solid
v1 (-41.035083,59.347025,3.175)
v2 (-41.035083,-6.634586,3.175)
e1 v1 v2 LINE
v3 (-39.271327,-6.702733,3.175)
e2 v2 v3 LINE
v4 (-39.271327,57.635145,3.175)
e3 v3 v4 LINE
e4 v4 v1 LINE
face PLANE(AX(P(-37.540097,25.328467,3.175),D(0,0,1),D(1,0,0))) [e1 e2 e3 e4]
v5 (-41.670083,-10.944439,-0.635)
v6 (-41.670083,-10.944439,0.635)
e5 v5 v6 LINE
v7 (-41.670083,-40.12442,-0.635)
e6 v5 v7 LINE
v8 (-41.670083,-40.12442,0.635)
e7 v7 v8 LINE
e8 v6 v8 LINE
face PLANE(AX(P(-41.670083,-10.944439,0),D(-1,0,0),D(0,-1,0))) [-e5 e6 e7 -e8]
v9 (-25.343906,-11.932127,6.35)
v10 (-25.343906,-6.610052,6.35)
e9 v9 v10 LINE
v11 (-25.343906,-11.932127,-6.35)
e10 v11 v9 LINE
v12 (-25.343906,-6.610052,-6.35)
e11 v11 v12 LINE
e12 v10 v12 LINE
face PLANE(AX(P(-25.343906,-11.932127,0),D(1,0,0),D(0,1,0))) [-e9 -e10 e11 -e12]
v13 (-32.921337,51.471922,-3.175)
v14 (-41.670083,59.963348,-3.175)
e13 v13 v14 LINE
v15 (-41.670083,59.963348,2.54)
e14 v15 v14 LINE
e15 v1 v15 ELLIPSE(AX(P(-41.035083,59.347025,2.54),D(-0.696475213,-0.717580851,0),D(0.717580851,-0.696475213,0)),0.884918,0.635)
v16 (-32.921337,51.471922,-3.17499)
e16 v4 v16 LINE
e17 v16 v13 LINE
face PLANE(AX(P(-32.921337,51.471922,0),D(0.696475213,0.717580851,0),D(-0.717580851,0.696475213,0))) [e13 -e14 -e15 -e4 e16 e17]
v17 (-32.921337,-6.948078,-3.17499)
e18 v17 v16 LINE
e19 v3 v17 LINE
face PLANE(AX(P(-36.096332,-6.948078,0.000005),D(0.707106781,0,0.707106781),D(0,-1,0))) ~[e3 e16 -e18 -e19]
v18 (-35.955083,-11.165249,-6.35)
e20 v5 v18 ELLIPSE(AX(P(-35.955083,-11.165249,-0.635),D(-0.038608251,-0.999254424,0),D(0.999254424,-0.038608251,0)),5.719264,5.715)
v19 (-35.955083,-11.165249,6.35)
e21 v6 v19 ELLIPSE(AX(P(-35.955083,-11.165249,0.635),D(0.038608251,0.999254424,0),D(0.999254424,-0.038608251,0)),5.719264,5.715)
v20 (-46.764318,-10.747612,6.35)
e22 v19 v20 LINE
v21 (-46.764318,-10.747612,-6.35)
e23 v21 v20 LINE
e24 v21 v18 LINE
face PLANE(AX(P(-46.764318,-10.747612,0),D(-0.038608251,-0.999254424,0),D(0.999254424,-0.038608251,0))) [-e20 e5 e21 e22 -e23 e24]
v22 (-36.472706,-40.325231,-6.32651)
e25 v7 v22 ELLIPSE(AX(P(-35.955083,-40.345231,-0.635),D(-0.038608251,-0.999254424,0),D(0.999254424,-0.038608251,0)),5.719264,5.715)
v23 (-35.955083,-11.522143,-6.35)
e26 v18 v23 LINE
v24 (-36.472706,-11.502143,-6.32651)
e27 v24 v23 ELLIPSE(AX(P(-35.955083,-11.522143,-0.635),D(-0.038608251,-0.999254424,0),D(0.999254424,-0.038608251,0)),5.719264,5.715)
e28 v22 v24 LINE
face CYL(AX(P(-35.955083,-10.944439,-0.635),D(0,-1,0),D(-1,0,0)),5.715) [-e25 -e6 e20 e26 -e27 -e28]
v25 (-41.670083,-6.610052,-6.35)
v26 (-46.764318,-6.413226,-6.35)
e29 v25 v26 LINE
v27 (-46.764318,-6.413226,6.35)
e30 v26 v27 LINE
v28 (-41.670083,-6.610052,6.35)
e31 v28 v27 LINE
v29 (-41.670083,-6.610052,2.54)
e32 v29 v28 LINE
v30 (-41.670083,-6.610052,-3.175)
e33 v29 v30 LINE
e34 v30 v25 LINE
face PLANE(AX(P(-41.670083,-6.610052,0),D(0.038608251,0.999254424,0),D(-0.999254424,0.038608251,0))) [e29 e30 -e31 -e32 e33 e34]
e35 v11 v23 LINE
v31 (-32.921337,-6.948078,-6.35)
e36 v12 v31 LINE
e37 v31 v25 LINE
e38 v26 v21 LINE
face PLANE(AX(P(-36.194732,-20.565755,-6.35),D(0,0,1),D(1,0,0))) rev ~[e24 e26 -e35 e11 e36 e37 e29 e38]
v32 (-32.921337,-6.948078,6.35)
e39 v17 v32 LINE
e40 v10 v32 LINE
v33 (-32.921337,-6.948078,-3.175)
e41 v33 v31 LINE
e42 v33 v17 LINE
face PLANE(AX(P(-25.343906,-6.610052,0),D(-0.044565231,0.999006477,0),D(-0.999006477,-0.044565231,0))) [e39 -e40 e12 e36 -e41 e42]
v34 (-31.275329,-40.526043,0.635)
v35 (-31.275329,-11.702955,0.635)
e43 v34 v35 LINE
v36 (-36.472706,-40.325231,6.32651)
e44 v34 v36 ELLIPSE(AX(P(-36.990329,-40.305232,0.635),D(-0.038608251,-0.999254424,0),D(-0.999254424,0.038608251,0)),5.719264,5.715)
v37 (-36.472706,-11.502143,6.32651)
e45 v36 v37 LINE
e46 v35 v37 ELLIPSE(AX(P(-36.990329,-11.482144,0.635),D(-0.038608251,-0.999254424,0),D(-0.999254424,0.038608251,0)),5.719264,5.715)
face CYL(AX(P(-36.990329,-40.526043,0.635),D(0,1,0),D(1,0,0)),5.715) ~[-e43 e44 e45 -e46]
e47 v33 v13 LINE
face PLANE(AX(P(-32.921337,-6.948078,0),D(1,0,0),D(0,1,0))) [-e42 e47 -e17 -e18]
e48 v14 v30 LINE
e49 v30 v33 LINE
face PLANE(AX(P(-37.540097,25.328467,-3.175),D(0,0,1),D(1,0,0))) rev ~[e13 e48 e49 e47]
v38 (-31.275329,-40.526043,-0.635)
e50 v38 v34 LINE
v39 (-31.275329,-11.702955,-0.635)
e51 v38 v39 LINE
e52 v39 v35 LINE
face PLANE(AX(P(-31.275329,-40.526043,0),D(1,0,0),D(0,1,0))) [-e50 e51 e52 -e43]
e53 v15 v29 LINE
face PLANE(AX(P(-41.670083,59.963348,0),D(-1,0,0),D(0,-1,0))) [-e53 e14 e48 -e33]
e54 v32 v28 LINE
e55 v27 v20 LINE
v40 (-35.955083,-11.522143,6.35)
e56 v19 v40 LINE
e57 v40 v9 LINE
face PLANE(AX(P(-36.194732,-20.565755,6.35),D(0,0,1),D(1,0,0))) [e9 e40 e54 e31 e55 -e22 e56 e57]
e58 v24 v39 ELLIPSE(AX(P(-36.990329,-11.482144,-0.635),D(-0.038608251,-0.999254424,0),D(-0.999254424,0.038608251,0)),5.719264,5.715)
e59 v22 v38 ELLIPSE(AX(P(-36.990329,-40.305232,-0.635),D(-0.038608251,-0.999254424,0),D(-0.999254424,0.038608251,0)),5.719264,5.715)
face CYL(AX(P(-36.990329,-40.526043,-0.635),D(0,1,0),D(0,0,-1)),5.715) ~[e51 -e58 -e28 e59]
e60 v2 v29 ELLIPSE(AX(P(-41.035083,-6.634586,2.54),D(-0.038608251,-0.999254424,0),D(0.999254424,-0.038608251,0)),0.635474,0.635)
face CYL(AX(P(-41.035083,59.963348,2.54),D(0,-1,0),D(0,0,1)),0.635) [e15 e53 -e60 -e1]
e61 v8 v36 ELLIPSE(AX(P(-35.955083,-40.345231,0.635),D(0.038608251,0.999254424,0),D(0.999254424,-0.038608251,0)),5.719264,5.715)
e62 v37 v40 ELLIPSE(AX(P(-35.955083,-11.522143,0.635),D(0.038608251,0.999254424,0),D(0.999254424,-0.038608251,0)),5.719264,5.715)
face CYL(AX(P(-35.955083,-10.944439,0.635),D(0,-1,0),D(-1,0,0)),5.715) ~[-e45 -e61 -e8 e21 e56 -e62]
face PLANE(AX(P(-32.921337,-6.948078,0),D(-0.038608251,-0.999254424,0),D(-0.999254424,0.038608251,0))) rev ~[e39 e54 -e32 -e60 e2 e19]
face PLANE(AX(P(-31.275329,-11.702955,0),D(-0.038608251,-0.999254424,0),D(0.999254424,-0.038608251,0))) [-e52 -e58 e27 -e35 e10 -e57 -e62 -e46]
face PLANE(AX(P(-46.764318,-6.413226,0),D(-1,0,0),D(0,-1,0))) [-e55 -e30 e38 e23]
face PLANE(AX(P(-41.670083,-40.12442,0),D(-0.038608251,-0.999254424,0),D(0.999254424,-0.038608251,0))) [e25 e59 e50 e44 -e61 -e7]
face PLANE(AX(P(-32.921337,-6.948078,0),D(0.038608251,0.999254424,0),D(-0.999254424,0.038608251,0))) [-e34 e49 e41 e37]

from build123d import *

# Parameters (mm, degrees)
F1_DEPTH      = 3.175
F1_DEPTH_BACK = 3.175
F2_DEPTH      = 6.35
F2_DEPTH_BACK = 6.35
F3_SIZE       = 6.34999
F4_R          = 5.715
F5_R          = 0.635


# Not quite as in the source:
# - a fillet or chamfer is up to 0.001 mm smaller than in the source, because OpenCascade refuses the exact size


with BuildPart() as f1:
    # F0 (on Top) → F1 (new body, two sides)
    with BuildSketch(Plane.XY) as f1_sk:
        Polygon((-41.6700830699, 59.9633481442), (-41.6700830699, -6.6100518558), (-32.9213373307, -6.9480776483), (-32.9213373307, 51.4719223517), align=None)
    extrude(amount=F1_DEPTH)
    extrude(f1_sk.sketch, amount=-F1_DEPTH_BACK)

    # F0 (on Top) → F2 (join, two sides)
    with BuildSketch(Plane.XY) as f2_sk:
        Polygon((-32.9213373307, -6.9480776483), (-41.6700830699, -6.6100518558), (-46.7643177352, -6.4132256179), (-46.7643177352, -10.747612454), (-41.6700830699, -10.9444386919), (-41.6700830699, -40.1244200766), (-31.2753289716, -40.5260427889), (-31.2753289716, -11.7029547691), (-25.3439064165, -11.9321274837), (-25.3439064165, -6.6100518558), align=None)
    extrude(amount=F2_DEPTH)
    extrude(f2_sk.sketch, amount=-F2_DEPTH_BACK)

    # F3 (size 6.35 in the source; OpenCascade refuses exactly that, so slightly less here)
    f3_edges = [f1.edges().sort_by_distance(p)[0] for p in [
        (-32.921337, 22.261922, 3.175),
    ]]
    chamfer(f3_edges, length=F3_SIZE)

    # F4 (call 1 of 4: OpenCascade refuses the feature's edges together)
    f4_edges = [f1.edges().sort_by_distance(p)[0] for p in [
        (-31.275329, -26.114499, 6.35),
    ]]
    fillet(f4_edges, radius=F4_R)

    # F4#2 (call 2 of 4)
    f4_2_edges = [f1.edges().sort_by_distance(p)[0] for p in [
        (-41.670083, -25.534429, 6.35),
    ]]
    fillet(f4_2_edges, radius=F4_R)

    # F4#3 (call 3 of 4)
    f4_3_edges = [f1.edges().sort_by_distance(p)[0] for p in [
        (-31.275329, -26.114499, -6.35),
    ]]
    fillet(f4_3_edges, radius=F4_R)

    # F4#4 (call 4 of 4)
    f4_4_edges = [f1.edges().sort_by_distance(p)[0] for p in [
        (-41.670083, -25.534429, -6.35),
    ]]
    fillet(f4_4_edges, radius=F4_R)

    # F5
    f5_edges = [f1.edges().sort_by_distance(p)[0] for p in [
        (-41.670083, 26.676648, 3.175),
    ]]
    fillet(f5_edges, radius=F5_R)


solid = f1.part
